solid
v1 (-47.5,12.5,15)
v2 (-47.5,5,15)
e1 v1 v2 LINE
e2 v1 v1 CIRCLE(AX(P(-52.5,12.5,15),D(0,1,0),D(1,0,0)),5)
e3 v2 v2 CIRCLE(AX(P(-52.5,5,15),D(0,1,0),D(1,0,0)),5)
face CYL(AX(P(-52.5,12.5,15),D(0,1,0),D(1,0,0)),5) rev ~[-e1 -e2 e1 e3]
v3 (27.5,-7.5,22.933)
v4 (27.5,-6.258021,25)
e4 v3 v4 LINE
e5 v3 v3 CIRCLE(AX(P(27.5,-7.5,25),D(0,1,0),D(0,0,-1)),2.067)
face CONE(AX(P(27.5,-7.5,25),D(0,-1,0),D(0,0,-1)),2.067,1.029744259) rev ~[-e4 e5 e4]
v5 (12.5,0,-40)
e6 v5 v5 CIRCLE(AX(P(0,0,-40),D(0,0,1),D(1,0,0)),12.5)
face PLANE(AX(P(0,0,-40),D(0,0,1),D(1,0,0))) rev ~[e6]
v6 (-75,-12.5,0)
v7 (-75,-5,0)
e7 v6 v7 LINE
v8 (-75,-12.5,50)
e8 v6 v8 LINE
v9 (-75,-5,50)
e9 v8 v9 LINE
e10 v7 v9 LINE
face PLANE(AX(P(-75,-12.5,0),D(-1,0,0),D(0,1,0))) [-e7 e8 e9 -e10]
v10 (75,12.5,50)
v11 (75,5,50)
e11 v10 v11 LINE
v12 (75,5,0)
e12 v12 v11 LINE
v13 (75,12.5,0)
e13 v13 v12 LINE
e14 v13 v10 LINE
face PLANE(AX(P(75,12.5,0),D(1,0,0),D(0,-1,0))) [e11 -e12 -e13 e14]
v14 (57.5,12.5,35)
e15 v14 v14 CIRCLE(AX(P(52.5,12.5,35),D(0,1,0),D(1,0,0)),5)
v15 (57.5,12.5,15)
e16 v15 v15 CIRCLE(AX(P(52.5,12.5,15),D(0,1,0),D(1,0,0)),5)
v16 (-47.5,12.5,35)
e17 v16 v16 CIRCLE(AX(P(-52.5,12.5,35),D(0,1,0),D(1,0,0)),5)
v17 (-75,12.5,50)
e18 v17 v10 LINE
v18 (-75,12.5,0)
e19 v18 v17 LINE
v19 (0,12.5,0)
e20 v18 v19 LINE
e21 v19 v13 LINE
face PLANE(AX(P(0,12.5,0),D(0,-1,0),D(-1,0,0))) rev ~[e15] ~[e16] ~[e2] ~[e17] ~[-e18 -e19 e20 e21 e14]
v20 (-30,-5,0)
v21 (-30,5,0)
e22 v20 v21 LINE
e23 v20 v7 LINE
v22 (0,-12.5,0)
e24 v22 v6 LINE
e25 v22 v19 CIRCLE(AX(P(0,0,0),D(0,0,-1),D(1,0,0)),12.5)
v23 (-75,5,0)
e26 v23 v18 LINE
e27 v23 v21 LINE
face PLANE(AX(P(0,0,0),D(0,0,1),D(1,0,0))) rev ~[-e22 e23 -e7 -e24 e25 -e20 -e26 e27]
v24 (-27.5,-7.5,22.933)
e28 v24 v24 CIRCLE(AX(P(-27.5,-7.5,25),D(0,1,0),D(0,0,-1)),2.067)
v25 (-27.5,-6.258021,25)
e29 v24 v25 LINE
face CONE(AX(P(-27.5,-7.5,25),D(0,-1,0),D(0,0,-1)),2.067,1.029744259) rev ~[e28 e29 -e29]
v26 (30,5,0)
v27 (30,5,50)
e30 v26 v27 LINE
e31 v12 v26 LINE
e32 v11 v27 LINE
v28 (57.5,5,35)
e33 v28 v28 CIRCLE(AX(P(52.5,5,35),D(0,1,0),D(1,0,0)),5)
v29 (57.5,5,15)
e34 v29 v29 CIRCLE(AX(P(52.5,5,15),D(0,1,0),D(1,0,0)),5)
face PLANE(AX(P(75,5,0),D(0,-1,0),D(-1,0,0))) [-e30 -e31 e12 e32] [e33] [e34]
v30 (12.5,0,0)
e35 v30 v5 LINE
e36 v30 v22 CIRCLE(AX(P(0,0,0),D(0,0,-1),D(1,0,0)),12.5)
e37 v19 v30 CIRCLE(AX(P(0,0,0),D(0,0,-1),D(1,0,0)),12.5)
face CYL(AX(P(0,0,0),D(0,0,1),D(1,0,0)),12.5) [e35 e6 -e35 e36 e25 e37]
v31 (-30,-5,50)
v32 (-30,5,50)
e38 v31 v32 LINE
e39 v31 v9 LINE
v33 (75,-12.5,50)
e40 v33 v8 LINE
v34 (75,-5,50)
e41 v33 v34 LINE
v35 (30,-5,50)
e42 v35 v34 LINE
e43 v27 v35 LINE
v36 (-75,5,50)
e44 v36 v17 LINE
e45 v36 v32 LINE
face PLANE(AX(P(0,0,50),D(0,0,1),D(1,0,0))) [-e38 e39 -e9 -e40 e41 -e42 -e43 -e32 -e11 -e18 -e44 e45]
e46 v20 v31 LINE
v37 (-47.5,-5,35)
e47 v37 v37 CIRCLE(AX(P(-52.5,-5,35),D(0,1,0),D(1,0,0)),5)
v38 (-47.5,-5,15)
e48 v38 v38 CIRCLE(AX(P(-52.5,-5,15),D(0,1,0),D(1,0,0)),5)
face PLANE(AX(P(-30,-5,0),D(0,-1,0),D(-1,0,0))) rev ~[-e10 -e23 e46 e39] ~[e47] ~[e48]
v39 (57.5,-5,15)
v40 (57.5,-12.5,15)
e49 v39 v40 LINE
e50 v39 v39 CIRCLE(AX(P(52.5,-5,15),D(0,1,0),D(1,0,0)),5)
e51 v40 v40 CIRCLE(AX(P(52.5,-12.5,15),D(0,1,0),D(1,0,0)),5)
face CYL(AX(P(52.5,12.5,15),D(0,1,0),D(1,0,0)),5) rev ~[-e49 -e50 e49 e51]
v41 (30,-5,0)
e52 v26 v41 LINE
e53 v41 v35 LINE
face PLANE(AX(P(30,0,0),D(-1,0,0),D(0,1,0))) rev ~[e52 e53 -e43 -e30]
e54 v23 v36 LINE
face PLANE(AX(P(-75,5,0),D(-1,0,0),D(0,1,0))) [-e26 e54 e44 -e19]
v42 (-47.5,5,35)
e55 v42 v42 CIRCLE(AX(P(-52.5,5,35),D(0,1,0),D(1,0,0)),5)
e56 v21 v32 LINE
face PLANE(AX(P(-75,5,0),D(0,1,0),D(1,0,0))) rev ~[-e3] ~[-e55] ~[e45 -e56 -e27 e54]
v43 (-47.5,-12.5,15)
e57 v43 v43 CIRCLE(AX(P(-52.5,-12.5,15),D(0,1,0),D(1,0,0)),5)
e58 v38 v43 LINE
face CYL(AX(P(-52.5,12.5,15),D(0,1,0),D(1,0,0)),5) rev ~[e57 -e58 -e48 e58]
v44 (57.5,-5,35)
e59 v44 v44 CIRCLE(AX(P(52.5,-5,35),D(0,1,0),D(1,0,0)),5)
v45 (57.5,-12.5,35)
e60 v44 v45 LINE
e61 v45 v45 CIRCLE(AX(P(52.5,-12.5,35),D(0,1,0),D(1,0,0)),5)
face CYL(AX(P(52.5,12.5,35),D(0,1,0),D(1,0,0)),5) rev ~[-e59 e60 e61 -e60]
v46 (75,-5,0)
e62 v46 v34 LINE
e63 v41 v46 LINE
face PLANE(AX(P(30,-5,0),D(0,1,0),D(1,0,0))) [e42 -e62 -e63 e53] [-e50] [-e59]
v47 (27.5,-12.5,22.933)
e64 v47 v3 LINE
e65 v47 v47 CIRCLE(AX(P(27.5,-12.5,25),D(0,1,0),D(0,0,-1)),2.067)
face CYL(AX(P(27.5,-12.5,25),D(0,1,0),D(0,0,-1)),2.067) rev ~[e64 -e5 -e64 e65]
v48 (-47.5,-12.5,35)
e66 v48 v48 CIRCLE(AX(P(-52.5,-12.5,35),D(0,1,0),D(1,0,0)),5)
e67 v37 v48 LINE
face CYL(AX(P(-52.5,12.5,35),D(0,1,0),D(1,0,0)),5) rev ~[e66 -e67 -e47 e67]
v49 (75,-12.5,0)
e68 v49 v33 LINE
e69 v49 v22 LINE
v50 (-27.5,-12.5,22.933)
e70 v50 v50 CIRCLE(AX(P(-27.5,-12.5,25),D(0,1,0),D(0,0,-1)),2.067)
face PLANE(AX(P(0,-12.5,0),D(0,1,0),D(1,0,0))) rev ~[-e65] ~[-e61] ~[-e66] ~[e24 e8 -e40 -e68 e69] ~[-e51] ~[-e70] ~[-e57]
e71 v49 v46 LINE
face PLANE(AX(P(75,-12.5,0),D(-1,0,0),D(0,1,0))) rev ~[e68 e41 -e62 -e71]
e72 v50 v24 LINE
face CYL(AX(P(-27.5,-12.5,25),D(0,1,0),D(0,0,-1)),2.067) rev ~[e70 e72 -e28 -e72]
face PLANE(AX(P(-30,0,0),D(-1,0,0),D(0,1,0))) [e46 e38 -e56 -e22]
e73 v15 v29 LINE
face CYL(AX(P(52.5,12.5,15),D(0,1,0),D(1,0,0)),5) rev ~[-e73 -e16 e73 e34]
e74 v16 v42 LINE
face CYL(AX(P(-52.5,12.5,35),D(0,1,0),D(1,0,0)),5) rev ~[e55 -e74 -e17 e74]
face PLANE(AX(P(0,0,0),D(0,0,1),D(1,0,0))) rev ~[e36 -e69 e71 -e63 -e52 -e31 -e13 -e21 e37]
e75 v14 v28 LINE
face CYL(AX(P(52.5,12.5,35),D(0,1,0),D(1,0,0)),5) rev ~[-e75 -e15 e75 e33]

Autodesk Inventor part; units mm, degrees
ref_plane "YZ Plane" through (0, 0, 0) normal (1, 0, 0) x (0, 1, 0)
ref_plane "XZ Plane" through (0, 0, 0) normal (0, 1, 0) x (-1, 0, 0)
ref_plane "XY Plane" through (0, 0, 0) normal (0, 0, 1) x (1, 0, 0)
sketch "Esboço1" plane through (0, 0, 0) normal (0, 0, 1) x (1, 0, 0)
  circle A0 centre (0, 0) radius 12.5
  arc A1 (0, 12.5) -> (0, 12.5) centre (0, 0) ccw
  line L0 (0, 12.5) -> (75, 12.5)
  line L1 (75, 12.5) -> (75, 5)
  line L2 (0, -12.5) -> (75, -12.5)
  line L3 (75, -12.5) -> (75, -5)
  line L4 (75, 5) -> (30, 5)
  line L5 (30, -5) -> (75, -5)
  line L6 (75, -5) -> (75, 5) construction
  line L7 (75, 0) -> (28.253, 0) construction
  line L8 (0, 0) -> (-5.8343, 0) construction
  arc A2 (11.9242, 3.75) -> (0, 12.5) centre (0, 0) ccw construction
  arc A3 (0, -12.5) -> (11.9242, -3.75) centre (0, 0) ccw construction
  arc A4 (11.9242, -3.75) -> (11.9242, 3.75) centre (0, 0) ccw construction
  line L9 (0, 0) -> (0, 31.0423) construction
  line L10 (0, 12.5) -> (-75, 12.5)
  line L11 (0, -12.5) -> (-75, -12.5)
  line L12 (-75, -12.5) -> (-75, -5)
  line L13 (-75, 5) -> (-30, 5)
  line L14 (-30, -5) -> (-75, -5)
  line L15 (-75, 5) -> (-75, 12.5)
  arc A5 (0, 12.5) -> (-11.9242, 3.75) centre (0, 0) ccw construction
  arc A6 (-11.9242, 3.75) -> (-11.9242, -3.75) centre (0, 0) ccw construction
  arc A7 (-11.9242, -3.75) -> (0, -12.5) centre (0, 0) ccw construction
  arc A8 (0, -12.5) -> (0, -12.5) centre (0, 0) ccw
  line L16 (30, -5) -> (30, 5)
  line L17 (-30, -5) -> (-30, 5)
  arc A9 (0, 12.5) -> (0, 12.5) centre (0, 22.5) ccw
  arc A10 (0, -12.5) -> (0, -12.5) centre (0, -22.5) ccw
  arc A11 (0, -12.5) -> (0, -12.5) centre (0, -22.5) ccw
  arc A12 (0, 12.5) -> (0, 12.5) centre (0, 22.5) ccw
  line L18 (-30, 0) -> (30, 0)
  line L19 (0, 0) -> (0, 17) construction
  dimension "d0" = 25
  dimension "d1" = 25
  dimension "d6" = 10
  dimension "d7" = 7.5
  dimension "d8" = 7.5
  dimension "d10" = 10
  dimension "d13" = 150
  dimension "d45" = 60
extrude "Extrusão1" add sketch "Esboço1" along normal blind 50 contours L18 A0 | L18 L16 L5 L3 L2 A0 | A0 L0 L1 L4 L16 L18 | A0 L18 | A0 L18 L17 L13 L15 L10 | L11 L12 L14 L17 L18 A0
extrude "Extrusão2" add sketch "Esboço1" against normal blind 40 contours L18 A0 | A0 L18
sketch "Esboço2" plane through (0, 12.5, 0) normal (0, 1, 0) x (1, 0, 0)
  circle A0 centre (52.5, -15) radius 5
  circle A1 centre (-52.5, -15) radius 5
  line L0 (75, 0) -> (75, -50) projected
  line L1 (-75, 0) -> (-75, -50) projected
  circle A2 centre (-52.5, -35) radius 5
  circle A3 centre (52.5, -35) radius 5
  line L2 (0, 0) -> (-75, 0) projected
  line L3 (-52.5, -35) -> (-52.5, -15) construction
  line L4 (75, 0) -> (0, 0) projected
  line L5 (52.5, -35) -> (52.5, -15) construction
  dimension "d17" = 10
  dimension "d18" = 10
  dimension "d22" = 150
  dimension "d23" = 22.5
  dimension "d29" = 22.5
  dimension "d38" = 10
  dimension "d40" = 20
  dimension "d41" = 10
  dimension "d44" = 20
  dimension "d63" = 15
  dimension "d64" = 15
extrude "Extrusão3" cut sketch "Esboço2" against normal up to surface (25 mm away)
sketch "Esboço4" plane through (-75, -12.5, 50) normal (0, -1, 0) x (1, 0, 0)
  circle A0 centre (47.5, -25) radius 2.5
  circle A1 centre (102.5, -25) radius 2.5
  line L0 (47.5, -25) -> (102.5, -25)
  line L1 (75, -25) -> (75, -15.8254)
  line L2 (150, 0) -> (0, 0) projected
  line L3 (75, 0) -> (75, 11.0535)
  line L4 (0, -50) -> (0, 0) projected
  line L5 (0, -25) -> (-11.4925, -25)
  point P0 (75, -50)
  dimension "d53" = 5
  dimension "d54" = 5
  dimension "d55" = 55
hole "Furo2" at (-27.5, -12.5, 25) at (27.5, -12.5, 25) direction (0, 1, 0) diameter 4.134 depth 5 tip angle 118 thread size "M5x0.8" class "6H" standard "ISO Metric profile"
equation "\"d8\" = d7"
equation "\"d29\" = d23"
equation "\"d38\" = d18"
equation "\"d41\" = d17"
properties part number "Junta"
